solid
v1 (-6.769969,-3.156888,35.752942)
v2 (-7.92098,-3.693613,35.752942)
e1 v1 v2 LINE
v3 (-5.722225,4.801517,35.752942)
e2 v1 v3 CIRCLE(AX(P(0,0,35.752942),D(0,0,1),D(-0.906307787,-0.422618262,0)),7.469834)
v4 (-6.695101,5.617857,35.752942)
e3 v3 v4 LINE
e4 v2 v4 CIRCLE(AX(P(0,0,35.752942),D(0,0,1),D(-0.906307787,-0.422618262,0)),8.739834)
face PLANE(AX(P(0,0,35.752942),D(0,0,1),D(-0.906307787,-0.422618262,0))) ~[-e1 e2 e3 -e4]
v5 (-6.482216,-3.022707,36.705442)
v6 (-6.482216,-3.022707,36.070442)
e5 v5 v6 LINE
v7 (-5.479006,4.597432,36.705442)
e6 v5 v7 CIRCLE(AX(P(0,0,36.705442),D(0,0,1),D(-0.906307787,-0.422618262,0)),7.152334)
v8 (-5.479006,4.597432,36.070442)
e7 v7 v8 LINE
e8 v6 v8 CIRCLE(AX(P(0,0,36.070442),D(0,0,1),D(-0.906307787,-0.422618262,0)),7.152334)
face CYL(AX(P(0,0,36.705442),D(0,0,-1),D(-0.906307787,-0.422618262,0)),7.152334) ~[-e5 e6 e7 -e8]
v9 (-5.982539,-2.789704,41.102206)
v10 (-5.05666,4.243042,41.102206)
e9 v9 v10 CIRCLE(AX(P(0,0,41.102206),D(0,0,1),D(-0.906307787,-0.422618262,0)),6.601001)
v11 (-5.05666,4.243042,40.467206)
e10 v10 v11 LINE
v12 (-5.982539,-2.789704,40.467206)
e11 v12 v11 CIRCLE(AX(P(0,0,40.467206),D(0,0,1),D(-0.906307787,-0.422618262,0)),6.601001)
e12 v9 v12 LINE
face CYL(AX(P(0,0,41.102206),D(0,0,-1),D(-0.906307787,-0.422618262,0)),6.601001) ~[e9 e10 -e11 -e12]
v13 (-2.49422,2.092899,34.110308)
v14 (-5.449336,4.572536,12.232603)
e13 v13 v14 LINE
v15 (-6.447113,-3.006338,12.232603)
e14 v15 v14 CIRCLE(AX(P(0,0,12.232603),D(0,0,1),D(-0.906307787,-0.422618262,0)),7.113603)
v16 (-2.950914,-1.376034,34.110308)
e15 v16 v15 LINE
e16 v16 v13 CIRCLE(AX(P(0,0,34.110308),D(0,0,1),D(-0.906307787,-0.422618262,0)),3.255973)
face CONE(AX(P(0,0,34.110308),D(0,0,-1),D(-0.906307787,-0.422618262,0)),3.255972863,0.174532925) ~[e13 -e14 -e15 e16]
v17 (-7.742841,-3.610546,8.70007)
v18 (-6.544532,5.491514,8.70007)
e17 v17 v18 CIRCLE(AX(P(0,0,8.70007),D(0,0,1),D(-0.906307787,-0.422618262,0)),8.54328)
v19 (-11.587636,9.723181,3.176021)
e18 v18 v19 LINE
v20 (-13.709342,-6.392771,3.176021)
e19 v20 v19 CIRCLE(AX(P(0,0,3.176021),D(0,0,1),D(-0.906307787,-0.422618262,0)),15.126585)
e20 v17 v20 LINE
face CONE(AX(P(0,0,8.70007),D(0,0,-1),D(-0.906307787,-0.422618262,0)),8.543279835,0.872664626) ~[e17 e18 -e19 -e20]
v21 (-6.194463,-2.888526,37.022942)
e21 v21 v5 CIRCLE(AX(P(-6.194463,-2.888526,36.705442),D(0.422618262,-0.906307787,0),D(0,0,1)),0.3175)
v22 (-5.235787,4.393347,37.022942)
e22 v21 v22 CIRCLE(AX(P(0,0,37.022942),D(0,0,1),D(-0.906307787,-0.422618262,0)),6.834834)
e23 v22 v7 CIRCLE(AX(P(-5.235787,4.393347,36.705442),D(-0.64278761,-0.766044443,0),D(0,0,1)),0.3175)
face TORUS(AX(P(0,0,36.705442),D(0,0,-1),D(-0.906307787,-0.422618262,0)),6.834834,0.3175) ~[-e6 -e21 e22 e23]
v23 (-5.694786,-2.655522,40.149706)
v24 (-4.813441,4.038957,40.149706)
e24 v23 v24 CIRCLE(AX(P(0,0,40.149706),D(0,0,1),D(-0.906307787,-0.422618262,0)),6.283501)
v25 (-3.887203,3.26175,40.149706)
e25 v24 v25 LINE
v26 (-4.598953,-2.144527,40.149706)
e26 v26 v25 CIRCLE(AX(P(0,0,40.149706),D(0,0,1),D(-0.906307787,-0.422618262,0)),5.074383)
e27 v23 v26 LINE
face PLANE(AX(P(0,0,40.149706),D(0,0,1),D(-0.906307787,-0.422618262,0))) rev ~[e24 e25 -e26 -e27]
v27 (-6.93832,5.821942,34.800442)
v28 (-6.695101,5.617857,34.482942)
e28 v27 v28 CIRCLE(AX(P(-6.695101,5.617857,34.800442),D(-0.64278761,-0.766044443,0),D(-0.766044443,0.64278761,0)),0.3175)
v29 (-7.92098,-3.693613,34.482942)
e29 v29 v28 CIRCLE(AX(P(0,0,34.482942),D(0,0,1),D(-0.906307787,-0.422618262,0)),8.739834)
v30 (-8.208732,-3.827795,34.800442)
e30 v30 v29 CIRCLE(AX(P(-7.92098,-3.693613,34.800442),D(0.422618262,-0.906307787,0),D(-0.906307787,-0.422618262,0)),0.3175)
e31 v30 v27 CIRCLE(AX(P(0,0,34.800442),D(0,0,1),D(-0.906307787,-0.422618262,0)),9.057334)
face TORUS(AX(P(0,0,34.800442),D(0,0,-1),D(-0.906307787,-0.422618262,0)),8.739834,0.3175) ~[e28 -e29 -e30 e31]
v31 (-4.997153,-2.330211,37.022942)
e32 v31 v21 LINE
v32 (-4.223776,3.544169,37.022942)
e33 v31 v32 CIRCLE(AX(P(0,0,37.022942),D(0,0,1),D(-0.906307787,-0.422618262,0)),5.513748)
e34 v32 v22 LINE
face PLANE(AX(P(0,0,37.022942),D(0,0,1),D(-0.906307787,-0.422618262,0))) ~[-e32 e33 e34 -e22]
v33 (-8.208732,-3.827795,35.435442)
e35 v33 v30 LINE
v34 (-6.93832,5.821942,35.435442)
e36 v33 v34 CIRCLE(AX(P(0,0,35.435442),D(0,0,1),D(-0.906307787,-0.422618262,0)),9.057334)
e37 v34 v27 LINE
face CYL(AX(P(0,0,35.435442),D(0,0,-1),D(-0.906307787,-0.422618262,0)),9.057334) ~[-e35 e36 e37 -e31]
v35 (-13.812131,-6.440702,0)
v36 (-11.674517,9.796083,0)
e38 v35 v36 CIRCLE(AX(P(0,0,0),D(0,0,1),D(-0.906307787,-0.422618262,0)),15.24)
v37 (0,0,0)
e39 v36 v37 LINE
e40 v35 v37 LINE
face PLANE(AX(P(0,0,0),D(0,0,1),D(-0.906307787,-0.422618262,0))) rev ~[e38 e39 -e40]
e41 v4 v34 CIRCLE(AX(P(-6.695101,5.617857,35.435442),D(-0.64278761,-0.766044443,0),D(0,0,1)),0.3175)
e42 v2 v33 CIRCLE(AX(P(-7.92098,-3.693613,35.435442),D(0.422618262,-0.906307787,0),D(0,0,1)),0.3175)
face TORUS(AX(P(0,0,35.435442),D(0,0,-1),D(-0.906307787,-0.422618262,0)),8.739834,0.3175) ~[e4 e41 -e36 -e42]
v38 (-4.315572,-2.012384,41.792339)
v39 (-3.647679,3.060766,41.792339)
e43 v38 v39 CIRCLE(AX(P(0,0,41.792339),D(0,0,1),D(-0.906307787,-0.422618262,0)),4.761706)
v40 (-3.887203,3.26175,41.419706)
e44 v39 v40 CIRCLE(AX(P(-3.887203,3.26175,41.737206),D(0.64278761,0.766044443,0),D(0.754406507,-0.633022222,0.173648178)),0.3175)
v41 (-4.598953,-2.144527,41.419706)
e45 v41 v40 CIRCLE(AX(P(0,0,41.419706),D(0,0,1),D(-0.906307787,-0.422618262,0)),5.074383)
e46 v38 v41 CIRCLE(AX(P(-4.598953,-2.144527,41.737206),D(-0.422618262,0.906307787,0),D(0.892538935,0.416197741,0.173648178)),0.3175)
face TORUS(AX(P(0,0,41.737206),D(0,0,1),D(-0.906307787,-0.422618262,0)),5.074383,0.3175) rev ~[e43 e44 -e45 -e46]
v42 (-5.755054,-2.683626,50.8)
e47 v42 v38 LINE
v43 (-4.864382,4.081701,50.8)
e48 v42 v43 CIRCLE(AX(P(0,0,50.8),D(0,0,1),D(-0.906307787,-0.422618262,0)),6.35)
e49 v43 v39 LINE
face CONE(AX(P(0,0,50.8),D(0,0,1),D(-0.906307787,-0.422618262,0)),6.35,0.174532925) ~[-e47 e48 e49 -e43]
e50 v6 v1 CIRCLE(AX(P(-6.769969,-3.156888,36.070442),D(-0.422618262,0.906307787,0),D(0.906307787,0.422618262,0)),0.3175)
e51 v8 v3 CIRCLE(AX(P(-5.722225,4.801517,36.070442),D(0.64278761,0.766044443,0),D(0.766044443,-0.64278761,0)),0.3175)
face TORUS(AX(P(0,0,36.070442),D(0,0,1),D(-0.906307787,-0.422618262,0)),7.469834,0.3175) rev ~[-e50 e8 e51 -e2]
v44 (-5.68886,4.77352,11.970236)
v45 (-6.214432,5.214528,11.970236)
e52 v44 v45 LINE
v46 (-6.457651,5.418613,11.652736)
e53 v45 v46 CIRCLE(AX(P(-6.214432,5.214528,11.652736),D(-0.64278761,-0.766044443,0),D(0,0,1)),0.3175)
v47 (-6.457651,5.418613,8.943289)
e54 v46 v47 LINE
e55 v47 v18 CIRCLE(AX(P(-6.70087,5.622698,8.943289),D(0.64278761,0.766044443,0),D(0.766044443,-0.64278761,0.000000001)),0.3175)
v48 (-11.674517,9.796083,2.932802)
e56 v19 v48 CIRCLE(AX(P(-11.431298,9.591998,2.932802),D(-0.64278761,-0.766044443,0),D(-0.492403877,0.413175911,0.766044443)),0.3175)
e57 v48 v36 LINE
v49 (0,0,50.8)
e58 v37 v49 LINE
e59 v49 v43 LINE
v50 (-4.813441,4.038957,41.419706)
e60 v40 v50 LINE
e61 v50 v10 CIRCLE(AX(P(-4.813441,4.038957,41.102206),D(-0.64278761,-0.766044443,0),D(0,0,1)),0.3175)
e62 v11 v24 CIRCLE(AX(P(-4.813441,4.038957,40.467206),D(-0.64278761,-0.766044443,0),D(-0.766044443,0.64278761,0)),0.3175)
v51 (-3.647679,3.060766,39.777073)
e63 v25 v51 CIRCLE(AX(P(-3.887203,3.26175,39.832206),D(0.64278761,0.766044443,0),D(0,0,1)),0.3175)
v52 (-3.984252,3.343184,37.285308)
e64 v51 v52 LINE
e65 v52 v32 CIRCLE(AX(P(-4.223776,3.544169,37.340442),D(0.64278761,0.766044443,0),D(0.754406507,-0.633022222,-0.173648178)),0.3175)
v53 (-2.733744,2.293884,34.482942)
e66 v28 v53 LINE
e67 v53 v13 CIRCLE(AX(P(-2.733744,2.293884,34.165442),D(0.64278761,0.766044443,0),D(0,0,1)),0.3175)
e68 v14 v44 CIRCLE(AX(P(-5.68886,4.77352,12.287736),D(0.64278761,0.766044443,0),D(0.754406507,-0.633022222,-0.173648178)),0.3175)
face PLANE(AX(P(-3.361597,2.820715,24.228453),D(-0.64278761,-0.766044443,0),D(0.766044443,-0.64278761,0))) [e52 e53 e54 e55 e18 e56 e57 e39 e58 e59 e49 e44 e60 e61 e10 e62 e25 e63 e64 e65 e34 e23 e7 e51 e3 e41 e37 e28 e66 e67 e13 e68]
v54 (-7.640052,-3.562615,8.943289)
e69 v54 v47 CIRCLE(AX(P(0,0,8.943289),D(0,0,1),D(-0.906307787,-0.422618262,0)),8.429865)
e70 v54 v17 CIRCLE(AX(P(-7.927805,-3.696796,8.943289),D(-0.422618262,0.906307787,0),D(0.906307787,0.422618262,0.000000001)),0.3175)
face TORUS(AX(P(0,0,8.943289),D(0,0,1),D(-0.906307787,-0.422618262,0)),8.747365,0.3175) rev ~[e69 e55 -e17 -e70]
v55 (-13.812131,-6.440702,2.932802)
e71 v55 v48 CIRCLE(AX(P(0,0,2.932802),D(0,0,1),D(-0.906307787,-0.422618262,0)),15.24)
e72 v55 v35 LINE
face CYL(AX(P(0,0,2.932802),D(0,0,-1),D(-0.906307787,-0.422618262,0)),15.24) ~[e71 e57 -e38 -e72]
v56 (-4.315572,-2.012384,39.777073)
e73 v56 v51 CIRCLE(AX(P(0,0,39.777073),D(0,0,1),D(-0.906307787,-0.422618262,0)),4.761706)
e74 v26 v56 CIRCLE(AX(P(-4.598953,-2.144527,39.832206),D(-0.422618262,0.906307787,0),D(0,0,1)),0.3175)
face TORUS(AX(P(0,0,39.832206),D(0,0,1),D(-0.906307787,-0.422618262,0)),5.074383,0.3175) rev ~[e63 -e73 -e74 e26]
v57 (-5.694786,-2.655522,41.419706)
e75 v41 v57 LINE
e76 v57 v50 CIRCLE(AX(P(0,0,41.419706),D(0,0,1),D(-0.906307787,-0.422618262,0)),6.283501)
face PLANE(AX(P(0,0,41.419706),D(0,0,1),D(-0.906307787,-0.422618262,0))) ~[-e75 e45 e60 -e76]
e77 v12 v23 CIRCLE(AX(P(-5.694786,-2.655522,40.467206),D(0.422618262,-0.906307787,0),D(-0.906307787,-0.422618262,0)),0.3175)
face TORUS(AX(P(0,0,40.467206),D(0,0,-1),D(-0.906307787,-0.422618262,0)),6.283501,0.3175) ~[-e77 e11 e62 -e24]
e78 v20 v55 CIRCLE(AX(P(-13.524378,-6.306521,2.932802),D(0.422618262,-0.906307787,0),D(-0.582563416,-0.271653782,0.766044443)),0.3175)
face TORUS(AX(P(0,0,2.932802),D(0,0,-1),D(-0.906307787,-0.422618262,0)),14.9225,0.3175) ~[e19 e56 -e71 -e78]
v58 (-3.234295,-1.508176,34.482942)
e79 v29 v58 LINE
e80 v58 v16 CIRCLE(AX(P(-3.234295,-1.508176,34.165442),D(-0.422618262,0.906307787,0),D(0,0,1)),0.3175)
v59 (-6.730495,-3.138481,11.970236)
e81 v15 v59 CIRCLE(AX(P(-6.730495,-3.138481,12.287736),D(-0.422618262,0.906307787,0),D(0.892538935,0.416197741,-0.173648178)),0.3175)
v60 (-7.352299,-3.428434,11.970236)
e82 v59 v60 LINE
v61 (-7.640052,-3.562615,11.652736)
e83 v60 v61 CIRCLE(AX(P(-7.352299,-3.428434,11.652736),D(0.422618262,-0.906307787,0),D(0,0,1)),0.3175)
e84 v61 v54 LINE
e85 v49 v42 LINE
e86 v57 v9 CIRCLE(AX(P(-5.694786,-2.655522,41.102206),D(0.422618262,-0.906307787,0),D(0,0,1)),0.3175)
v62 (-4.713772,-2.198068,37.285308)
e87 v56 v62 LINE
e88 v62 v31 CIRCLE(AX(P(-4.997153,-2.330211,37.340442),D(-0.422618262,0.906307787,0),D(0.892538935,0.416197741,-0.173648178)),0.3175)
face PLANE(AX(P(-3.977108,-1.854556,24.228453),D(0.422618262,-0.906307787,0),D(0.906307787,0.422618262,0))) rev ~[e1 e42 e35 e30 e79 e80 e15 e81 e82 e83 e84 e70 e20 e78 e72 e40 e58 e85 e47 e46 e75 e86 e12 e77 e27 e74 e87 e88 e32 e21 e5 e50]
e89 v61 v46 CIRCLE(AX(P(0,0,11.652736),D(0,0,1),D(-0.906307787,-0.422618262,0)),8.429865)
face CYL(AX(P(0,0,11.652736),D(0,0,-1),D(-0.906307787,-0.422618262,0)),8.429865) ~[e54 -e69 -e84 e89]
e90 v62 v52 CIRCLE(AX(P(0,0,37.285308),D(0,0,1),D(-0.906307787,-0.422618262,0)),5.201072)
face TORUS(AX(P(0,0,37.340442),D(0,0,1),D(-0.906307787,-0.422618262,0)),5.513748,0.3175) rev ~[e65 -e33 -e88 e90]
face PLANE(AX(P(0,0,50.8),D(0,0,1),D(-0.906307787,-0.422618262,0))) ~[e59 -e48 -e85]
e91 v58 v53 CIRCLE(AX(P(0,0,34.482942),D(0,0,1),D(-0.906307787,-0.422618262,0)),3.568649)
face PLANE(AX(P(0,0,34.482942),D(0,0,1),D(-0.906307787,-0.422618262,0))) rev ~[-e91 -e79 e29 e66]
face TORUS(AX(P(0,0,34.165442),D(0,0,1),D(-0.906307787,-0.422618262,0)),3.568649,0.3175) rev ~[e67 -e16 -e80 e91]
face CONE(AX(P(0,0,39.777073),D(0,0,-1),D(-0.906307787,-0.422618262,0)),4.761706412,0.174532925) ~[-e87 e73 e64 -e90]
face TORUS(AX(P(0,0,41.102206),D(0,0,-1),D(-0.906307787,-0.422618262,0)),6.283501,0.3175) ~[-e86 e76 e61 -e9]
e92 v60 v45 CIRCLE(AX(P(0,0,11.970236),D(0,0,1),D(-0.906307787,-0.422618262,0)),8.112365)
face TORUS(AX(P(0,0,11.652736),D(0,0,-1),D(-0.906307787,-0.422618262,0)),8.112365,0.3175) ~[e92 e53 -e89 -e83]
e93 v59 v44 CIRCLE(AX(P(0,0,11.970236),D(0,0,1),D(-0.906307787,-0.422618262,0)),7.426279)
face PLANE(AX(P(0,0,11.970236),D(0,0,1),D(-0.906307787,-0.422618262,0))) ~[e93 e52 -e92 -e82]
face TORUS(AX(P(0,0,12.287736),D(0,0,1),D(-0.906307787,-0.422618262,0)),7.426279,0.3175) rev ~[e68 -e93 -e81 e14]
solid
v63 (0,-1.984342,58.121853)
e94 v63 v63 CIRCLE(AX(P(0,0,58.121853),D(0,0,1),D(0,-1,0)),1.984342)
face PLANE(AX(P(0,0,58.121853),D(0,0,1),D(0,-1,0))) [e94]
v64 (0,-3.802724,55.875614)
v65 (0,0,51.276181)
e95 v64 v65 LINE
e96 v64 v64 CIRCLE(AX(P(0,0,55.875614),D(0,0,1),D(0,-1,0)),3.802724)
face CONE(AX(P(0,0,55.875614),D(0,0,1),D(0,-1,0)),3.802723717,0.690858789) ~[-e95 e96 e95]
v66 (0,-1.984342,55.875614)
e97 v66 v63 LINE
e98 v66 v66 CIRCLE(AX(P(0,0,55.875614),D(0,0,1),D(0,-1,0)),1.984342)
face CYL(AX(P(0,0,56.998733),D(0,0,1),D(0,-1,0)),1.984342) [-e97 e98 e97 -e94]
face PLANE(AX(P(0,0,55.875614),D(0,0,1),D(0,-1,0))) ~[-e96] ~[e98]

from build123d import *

# Parameters (mm, degrees)
F1_ANGLE_START = 25
F1_ANGLE       = 295
F2_W           = 1.9843422342
F2_H           = 2.2462382913


# Not quite as in the source:
# - a feature of the source that left no trace in its solid (it failed there, or was rolled back) is left out


with BuildPart() as f1:
    # F0 (on Front) → F1 (revolve)
    with BuildSketch(Plane.XZ, mode=Mode.PRIVATE) as f1_sk:
        with BuildLine():
            Line((-15.24, 0), (0, 0))
            Line((0, 0), (0, 50.8))
            Line((0, 50.8), (-6.35, 50.8))
            Line((-6.35, 50.8), (-4.7617064118, 41.792339449))
            ThreePointArc((-4.7617064118, 41.792339449), (-4.8311637627, 41.5331210865), (-5.0743828734, 41.4197061526))
            Line((-5.0743828734, 41.4197061526), (-6.2835011077, 41.4197061526))
            ThreePointArc((-6.2835011077, 41.4197061526), (-6.5080075107, 41.3267125556), (-6.6010011077, 41.1022061526))
            Line((-6.6010011077, 41.1022061526), (-6.6010011077, 40.4672061526))
            ThreePointArc((-6.6010011077, 40.4672061526), (-6.5080075107, 40.2426997495), (-6.2835011077, 40.1497061526))
            Line((-6.2835011077, 40.1497061526), (-5.0743828734, 40.1497061526))
            ThreePointArc((-5.0743828734, 40.1497061526), (-4.8311637627, 40.0362912186), (-4.7617064118, 39.7770728561))
            Line((-4.7617064118, 39.7770728561), (-5.2010717431, 37.2853082403))
            ThreePointArc((-5.2010717431, 37.2853082403), (-5.3096631386, 37.0972224261), (-5.5137482047, 37.0229415367))
            Line((-5.5137482047, 37.0229415367), (-6.8348340718, 37.0229415367))
            ThreePointArc((-6.8348340718, 37.0229415367), (-7.0593404748, 36.9299479398), (-7.1523340718, 36.7054415367))
            Line((-7.1523340718, 36.7054415367), (-7.1523340718, 36.0704415367))
            ThreePointArc((-7.1523340718, 36.0704415367), (-7.2453276688, 35.8459351337), (-7.4698340718, 35.7529415367))
            Line((-7.4698340718, 35.7529415367), (-8.7398340718, 35.7529415367))
            ThreePointArc((-8.7398340718, 35.7529415367), (-8.9643404748, 35.6599479398), (-9.0573340718, 35.4354415367))
            Line((-9.0573340718, 35.4354415367), (-9.0573340718, 34.8004415367))
            ThreePointArc((-9.0573340718, 34.8004415367), (-8.9643404748, 34.5759351337), (-8.7398340718, 34.4829415367))
            Line((-8.7398340718, 34.4829415367), (-3.5686493249, 34.4829415367))
            ThreePointArc((-3.5686493249, 34.4829415367), (-3.3254302142, 34.3695266028), (-3.2559728633, 34.1103082403))
            Line((-3.2559728633, 34.1103082403), (-7.113602572, 12.2326030065))
            ThreePointArc((-7.113602572, 12.2326030065), (-7.2221939675, 12.0445171922), (-7.4262790336, 11.9702363029))
            Line((-7.4262790336, 11.9702363029), (-8.1123649007, 11.9702363029))
            ThreePointArc((-8.1123649007, 11.9702363029), (-8.3368713037, 11.8772427059), (-8.4298649007, 11.6527363029))
            Line((-8.4298649007, 11.6527363029), (-8.4298649007, 8.9432889844))
            ThreePointArc((-8.4298649007, 8.9432889844), (-8.4596121783, 8.8091076862), (-8.5432798346, 8.7000698737))
            Line((-8.5432798346, 8.7000698737), (-15.1265850661, 3.176020882))
            ThreePointArc((-15.1265850661, 3.176020882), (-15.2102527224, 3.0669830694), (-15.24, 2.9328017713))
            Line((-15.24, 2.9328017713), (-15.24, 0))
        make_face()
    revolve(f1_sk.sketch.rotate(Axis((0, 0, 25.4), (0, 0, 1)), F1_ANGLE_START), axis=Axis((0, 0, 25.4), (0, 0, 1)), revolution_arc=F1_ANGLE)


with BuildPart() as f3:
    # F2 (on Right) → F3 (revolve)
    with BuildSketch(Plane.YZ):
        Polygon((-3.8027237169, 55.8756142855), (0, 51.2761808932), (0, 55.8756142855), (-1.9843422342, 55.8756142855), align=None)
        with Locations((-0.9921711171, 56.9987334311)):
            Rectangle(F2_W, F2_H)
    revolve(axis=Axis((0, 0, 56.9987334311), (0, 0, 1)))


solid = Compound([f1.part, f3.part])
